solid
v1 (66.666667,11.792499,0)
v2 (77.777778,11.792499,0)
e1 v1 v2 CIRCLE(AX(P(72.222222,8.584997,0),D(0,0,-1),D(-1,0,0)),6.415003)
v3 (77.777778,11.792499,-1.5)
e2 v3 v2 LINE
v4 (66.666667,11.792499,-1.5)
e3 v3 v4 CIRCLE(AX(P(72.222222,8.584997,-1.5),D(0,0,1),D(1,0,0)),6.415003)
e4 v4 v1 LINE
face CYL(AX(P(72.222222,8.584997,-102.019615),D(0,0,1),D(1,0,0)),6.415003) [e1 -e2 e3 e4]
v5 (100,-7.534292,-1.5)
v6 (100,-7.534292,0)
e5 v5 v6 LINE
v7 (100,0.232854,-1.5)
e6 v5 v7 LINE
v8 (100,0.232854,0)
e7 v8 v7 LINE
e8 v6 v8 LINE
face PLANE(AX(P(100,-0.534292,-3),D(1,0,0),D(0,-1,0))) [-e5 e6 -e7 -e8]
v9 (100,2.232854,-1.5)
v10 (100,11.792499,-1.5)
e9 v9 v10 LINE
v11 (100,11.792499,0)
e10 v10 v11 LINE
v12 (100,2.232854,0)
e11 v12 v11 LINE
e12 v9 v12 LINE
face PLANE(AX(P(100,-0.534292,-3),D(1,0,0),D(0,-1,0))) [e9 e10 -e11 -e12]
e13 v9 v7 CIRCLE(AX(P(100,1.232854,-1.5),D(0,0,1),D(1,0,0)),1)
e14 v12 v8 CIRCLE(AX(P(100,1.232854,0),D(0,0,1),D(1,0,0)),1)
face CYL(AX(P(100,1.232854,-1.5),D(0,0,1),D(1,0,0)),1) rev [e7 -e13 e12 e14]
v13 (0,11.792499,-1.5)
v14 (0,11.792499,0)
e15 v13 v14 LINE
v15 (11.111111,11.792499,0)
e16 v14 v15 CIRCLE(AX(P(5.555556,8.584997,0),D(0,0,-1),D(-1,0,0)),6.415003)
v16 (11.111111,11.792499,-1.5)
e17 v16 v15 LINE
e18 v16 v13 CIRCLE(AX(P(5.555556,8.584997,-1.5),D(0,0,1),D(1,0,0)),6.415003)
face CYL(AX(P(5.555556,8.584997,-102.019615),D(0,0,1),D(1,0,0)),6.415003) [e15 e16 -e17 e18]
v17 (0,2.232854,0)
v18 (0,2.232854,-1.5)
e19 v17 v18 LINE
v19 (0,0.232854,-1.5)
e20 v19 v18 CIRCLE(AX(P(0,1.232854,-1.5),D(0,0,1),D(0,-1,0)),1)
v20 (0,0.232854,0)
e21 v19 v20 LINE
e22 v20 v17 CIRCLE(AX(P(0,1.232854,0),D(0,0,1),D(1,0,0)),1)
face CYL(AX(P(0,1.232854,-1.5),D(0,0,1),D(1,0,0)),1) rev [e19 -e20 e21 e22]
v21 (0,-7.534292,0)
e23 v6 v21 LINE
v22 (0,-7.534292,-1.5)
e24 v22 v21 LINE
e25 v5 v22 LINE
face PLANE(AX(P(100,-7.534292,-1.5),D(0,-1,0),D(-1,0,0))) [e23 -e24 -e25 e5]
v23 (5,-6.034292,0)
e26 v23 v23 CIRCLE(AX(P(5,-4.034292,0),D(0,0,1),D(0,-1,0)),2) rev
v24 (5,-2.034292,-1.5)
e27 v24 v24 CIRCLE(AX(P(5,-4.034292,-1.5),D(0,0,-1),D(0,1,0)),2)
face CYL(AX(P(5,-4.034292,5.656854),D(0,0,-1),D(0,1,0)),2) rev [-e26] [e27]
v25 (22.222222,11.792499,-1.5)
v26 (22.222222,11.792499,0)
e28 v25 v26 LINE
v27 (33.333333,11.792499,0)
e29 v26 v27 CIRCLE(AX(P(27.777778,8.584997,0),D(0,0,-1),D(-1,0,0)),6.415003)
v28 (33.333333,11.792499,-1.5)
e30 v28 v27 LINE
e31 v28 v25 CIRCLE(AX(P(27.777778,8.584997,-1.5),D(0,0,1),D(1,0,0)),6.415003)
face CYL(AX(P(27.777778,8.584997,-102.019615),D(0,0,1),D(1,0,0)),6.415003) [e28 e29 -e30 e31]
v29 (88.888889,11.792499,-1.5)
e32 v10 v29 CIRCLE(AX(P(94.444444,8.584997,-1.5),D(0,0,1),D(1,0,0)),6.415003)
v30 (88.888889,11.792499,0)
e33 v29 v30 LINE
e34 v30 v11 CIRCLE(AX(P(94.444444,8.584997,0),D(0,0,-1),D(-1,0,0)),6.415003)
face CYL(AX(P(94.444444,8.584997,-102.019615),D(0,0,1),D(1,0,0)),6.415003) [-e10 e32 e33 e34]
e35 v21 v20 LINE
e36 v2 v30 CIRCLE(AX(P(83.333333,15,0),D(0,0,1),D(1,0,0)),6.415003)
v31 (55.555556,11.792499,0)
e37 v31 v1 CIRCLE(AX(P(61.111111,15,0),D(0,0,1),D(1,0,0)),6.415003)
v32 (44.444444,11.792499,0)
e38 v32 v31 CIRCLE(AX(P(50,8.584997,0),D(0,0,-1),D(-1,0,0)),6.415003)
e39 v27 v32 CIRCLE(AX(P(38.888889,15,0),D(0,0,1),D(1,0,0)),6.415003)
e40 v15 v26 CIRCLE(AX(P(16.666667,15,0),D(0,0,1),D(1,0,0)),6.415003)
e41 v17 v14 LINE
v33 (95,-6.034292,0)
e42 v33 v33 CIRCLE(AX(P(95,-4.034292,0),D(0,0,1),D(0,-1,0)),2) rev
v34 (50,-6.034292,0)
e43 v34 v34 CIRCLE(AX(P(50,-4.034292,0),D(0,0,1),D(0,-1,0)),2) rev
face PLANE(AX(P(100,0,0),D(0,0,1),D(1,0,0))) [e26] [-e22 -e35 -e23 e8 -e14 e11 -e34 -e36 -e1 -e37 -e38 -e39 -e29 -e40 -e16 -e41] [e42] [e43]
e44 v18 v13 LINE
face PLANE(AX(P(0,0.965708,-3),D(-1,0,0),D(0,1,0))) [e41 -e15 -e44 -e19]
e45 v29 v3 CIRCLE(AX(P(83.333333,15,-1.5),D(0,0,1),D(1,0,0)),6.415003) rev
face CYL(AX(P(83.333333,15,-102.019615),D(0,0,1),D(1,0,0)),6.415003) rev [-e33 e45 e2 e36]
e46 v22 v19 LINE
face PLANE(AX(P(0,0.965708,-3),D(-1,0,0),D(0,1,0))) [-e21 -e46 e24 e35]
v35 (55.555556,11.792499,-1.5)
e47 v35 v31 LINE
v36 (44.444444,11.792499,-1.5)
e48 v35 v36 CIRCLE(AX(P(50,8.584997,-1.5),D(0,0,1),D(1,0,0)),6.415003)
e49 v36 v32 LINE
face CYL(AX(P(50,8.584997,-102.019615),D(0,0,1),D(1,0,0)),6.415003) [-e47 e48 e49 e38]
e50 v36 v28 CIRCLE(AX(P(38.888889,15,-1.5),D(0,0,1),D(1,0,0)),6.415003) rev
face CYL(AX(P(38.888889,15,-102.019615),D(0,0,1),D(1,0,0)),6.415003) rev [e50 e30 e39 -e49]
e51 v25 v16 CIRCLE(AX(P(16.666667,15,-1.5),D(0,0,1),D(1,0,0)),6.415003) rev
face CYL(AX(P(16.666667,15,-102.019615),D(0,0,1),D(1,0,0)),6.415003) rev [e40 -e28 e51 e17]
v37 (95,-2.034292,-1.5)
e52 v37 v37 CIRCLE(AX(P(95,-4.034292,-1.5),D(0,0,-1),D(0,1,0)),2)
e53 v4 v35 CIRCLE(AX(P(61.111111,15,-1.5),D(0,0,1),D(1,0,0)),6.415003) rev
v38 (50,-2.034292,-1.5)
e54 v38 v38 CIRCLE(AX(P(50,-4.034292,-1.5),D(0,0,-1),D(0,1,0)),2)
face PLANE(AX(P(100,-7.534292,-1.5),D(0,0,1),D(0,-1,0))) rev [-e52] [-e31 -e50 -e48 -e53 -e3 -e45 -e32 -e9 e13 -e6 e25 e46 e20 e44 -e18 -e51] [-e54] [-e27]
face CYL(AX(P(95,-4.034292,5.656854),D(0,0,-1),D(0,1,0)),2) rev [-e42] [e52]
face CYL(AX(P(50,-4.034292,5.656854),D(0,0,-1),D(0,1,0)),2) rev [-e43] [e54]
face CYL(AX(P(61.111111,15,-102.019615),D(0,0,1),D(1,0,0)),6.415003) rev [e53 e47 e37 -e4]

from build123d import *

# Parameters (mm, degrees)
SM_BASE_FLANGE_1_DEPTH    = 100
CUT_EXTRUDE_1_DEPTH       = 1.5
SKETCH_7_R                = 2
CUT_EXTRUDE_2_DEPTH       = 1.5
CUT_EXTRUDE_START         = -10
CUT_EXTRUDE_3_OUTLINE_W   = 100
CUT_EXTRUDE_3_OUTLINE_H   = 4
CUT_EXTRUDE_3_DEPTH       = 8.5
CUT_EXTRUDE_START_2       = -1.5
CUT_EXTRUDE_3_2_DEPTH     = 1.5
CUT_EXTRUDE_3_3_OUTLINE_R = 2
CUT_EXTRUDE_3_3_DEPTH     = 1.5


# Read off the part's stored shape, not the designer's step: Вырез-Вытянуть3
# Sheet-metal steps are written as plain solids
with BuildPart() as part:
    # Sketch 1 → Базовая кромка1 (new body)
    with BuildSketch(Plane(origin=(0, 0, 0), x_dir=(0, 0, -1), z_dir=(1, 0, 0))):
        with BuildLine():
            Line((10, 0), (3, 0))
            ThreePointArc((3, 0), (0.878679656, 0.878679656), (0, 3))
            Line((0, 3), (0, 15))
            Line((0, 15), (1.5, 15))
            Line((1.5, 15), (1.5, 3))
            ThreePointArc((1.5, 3), (1.939339828, 1.939339828), (3, 1.5))
            Line((3, 1.5), (10, 1.5))
            Line((10, 1.5), (10, 0))
        make_face()
    extrude(amount=SM_BASE_FLANGE_1_DEPTH)

    # Эскиз6 → Вырез-Вытянуть1 (cut)
    with BuildSketch(Plane.XY):
        with BuildLine():
            Line((0, 11.792498505), (0, 18.792498505))
            Line((0, 18.792498505), (100, 18.792498505))
            Line((100, 18.792498505), (100, 11.792498505))
            ThreePointArc((100, 11.792498505), (94.444444444, 15), (88.888888889, 11.792498505))
            ThreePointArc((88.888888889, 11.792498505), (83.333333333, 8.584997009), (77.777777778, 11.792498505))
            ThreePointArc((77.777777778, 11.792498505), (72.222222222, 15), (66.666666667, 11.792498505))
            ThreePointArc((66.666666667, 11.792498505), (61.111111111, 8.584997009), (55.555555556, 11.792498505))
            ThreePointArc((55.555555556, 11.792498505), (50, 15), (44.444444444, 11.792498505))
            ThreePointArc((44.444444444, 11.792498505), (38.888888889, 8.584997009), (33.333333333, 11.792498505))
            ThreePointArc((33.333333333, 11.792498505), (27.777777778, 15), (22.222222222, 11.792498505))
            ThreePointArc((22.222222222, 11.792498505), (16.666666667, 8.584997009), (11.111111111, 11.792498505))
            ThreePointArc((11.111111111, 11.792498505), (5.555555556, 15), (0, 11.792498505))
        make_face()
    extrude(amount=-CUT_EXTRUDE_1_DEPTH, mode=Mode.SUBTRACT)

    # Эскиз7 → Вырез-Вытянуть2 (cut)
    with BuildSketch(Plane(origin=(0, 1.5, 0), x_dir=(1, 0, 0), z_dir=(0, 1, 0))):
        with Locations(Location((50, 6.5, 0), (0, 0, 270))):
            Circle(SKETCH_7_R)
        with Locations(Location((95, 6.5, 0), (0, 0, 270))):
            Circle(SKETCH_7_R)
        with Locations(Location((5, 6.5, 0), (0, 0, 270))):
            Circle(SKETCH_7_R)
    extrude(amount=-CUT_EXTRUDE_2_DEPTH, mode=Mode.SUBTRACT)

    # Вырез-Вытянуть3 outline → Вырез-Вытянуть3 (cut)
    with BuildSketch(Plane.XY.offset(CUT_EXTRUDE_START)):
        with Locations((50, 2)):
            Rectangle(CUT_EXTRUDE_3_OUTLINE_W, CUT_EXTRUDE_3_OUTLINE_H)
    extrude(amount=CUT_EXTRUDE_3_DEPTH, mode=Mode.SUBTRACT)

    # Cut-Extrude 3 2 outline → Cut-Extrude 3 2 (cut)
    with BuildSketch(Plane.XY.offset(CUT_EXTRUDE_START_2)):
        with BuildLine():
            ThreePointArc((0, 0.232854132), (1, 1.232854132), (0, 2.232854132))
            Line((0, 2.232854132), (0, 0.232854132))
        make_face()
        with BuildLine():
            Line((100, 0.232854132), (100, 2.232854132))
            ThreePointArc((100, 2.232854132), (99, 1.232854132), (100, 0.232854132))
        make_face()
    extrude(amount=CUT_EXTRUDE_3_2_DEPTH, mode=Mode.SUBTRACT)

    # Cut-Extrude 3 3 outline → Cut-Extrude 3 3 (add)
    with BuildSketch(Plane.XY.offset(CUT_EXTRUDE_START_2)):
        with BuildLine():
            Line((0, 0.232854132), (0, -7.534291735))
            Line((0, -7.534291735), (100, -7.534291735))
            Line((100, -7.534291735), (100, 0.232854132))
            ThreePointArc((100, 0.232854132), (99, 1.232854132), (100, 2.232854132))
            Line((100, 2.232854132), (100, 4))
            Line((100, 4), (0, 4))
            Line((0, 4), (0, 2.232854132))
            ThreePointArc((0, 2.232854132), (1, 1.232854132), (0, 0.232854132))
        make_face()
        with Locations((95, -4.034291735)):
            Circle(CUT_EXTRUDE_3_3_OUTLINE_R, mode=Mode.SUBTRACT)
        with Locations((5, -4.034291735)):
            Circle(CUT_EXTRUDE_3_3_OUTLINE_R, mode=Mode.SUBTRACT)
        with Locations((50, -4.034291735)):
            Circle(CUT_EXTRUDE_3_3_OUTLINE_R, mode=Mode.SUBTRACT)
    extrude(amount=CUT_EXTRUDE_3_3_DEPTH)


solid = part.part
